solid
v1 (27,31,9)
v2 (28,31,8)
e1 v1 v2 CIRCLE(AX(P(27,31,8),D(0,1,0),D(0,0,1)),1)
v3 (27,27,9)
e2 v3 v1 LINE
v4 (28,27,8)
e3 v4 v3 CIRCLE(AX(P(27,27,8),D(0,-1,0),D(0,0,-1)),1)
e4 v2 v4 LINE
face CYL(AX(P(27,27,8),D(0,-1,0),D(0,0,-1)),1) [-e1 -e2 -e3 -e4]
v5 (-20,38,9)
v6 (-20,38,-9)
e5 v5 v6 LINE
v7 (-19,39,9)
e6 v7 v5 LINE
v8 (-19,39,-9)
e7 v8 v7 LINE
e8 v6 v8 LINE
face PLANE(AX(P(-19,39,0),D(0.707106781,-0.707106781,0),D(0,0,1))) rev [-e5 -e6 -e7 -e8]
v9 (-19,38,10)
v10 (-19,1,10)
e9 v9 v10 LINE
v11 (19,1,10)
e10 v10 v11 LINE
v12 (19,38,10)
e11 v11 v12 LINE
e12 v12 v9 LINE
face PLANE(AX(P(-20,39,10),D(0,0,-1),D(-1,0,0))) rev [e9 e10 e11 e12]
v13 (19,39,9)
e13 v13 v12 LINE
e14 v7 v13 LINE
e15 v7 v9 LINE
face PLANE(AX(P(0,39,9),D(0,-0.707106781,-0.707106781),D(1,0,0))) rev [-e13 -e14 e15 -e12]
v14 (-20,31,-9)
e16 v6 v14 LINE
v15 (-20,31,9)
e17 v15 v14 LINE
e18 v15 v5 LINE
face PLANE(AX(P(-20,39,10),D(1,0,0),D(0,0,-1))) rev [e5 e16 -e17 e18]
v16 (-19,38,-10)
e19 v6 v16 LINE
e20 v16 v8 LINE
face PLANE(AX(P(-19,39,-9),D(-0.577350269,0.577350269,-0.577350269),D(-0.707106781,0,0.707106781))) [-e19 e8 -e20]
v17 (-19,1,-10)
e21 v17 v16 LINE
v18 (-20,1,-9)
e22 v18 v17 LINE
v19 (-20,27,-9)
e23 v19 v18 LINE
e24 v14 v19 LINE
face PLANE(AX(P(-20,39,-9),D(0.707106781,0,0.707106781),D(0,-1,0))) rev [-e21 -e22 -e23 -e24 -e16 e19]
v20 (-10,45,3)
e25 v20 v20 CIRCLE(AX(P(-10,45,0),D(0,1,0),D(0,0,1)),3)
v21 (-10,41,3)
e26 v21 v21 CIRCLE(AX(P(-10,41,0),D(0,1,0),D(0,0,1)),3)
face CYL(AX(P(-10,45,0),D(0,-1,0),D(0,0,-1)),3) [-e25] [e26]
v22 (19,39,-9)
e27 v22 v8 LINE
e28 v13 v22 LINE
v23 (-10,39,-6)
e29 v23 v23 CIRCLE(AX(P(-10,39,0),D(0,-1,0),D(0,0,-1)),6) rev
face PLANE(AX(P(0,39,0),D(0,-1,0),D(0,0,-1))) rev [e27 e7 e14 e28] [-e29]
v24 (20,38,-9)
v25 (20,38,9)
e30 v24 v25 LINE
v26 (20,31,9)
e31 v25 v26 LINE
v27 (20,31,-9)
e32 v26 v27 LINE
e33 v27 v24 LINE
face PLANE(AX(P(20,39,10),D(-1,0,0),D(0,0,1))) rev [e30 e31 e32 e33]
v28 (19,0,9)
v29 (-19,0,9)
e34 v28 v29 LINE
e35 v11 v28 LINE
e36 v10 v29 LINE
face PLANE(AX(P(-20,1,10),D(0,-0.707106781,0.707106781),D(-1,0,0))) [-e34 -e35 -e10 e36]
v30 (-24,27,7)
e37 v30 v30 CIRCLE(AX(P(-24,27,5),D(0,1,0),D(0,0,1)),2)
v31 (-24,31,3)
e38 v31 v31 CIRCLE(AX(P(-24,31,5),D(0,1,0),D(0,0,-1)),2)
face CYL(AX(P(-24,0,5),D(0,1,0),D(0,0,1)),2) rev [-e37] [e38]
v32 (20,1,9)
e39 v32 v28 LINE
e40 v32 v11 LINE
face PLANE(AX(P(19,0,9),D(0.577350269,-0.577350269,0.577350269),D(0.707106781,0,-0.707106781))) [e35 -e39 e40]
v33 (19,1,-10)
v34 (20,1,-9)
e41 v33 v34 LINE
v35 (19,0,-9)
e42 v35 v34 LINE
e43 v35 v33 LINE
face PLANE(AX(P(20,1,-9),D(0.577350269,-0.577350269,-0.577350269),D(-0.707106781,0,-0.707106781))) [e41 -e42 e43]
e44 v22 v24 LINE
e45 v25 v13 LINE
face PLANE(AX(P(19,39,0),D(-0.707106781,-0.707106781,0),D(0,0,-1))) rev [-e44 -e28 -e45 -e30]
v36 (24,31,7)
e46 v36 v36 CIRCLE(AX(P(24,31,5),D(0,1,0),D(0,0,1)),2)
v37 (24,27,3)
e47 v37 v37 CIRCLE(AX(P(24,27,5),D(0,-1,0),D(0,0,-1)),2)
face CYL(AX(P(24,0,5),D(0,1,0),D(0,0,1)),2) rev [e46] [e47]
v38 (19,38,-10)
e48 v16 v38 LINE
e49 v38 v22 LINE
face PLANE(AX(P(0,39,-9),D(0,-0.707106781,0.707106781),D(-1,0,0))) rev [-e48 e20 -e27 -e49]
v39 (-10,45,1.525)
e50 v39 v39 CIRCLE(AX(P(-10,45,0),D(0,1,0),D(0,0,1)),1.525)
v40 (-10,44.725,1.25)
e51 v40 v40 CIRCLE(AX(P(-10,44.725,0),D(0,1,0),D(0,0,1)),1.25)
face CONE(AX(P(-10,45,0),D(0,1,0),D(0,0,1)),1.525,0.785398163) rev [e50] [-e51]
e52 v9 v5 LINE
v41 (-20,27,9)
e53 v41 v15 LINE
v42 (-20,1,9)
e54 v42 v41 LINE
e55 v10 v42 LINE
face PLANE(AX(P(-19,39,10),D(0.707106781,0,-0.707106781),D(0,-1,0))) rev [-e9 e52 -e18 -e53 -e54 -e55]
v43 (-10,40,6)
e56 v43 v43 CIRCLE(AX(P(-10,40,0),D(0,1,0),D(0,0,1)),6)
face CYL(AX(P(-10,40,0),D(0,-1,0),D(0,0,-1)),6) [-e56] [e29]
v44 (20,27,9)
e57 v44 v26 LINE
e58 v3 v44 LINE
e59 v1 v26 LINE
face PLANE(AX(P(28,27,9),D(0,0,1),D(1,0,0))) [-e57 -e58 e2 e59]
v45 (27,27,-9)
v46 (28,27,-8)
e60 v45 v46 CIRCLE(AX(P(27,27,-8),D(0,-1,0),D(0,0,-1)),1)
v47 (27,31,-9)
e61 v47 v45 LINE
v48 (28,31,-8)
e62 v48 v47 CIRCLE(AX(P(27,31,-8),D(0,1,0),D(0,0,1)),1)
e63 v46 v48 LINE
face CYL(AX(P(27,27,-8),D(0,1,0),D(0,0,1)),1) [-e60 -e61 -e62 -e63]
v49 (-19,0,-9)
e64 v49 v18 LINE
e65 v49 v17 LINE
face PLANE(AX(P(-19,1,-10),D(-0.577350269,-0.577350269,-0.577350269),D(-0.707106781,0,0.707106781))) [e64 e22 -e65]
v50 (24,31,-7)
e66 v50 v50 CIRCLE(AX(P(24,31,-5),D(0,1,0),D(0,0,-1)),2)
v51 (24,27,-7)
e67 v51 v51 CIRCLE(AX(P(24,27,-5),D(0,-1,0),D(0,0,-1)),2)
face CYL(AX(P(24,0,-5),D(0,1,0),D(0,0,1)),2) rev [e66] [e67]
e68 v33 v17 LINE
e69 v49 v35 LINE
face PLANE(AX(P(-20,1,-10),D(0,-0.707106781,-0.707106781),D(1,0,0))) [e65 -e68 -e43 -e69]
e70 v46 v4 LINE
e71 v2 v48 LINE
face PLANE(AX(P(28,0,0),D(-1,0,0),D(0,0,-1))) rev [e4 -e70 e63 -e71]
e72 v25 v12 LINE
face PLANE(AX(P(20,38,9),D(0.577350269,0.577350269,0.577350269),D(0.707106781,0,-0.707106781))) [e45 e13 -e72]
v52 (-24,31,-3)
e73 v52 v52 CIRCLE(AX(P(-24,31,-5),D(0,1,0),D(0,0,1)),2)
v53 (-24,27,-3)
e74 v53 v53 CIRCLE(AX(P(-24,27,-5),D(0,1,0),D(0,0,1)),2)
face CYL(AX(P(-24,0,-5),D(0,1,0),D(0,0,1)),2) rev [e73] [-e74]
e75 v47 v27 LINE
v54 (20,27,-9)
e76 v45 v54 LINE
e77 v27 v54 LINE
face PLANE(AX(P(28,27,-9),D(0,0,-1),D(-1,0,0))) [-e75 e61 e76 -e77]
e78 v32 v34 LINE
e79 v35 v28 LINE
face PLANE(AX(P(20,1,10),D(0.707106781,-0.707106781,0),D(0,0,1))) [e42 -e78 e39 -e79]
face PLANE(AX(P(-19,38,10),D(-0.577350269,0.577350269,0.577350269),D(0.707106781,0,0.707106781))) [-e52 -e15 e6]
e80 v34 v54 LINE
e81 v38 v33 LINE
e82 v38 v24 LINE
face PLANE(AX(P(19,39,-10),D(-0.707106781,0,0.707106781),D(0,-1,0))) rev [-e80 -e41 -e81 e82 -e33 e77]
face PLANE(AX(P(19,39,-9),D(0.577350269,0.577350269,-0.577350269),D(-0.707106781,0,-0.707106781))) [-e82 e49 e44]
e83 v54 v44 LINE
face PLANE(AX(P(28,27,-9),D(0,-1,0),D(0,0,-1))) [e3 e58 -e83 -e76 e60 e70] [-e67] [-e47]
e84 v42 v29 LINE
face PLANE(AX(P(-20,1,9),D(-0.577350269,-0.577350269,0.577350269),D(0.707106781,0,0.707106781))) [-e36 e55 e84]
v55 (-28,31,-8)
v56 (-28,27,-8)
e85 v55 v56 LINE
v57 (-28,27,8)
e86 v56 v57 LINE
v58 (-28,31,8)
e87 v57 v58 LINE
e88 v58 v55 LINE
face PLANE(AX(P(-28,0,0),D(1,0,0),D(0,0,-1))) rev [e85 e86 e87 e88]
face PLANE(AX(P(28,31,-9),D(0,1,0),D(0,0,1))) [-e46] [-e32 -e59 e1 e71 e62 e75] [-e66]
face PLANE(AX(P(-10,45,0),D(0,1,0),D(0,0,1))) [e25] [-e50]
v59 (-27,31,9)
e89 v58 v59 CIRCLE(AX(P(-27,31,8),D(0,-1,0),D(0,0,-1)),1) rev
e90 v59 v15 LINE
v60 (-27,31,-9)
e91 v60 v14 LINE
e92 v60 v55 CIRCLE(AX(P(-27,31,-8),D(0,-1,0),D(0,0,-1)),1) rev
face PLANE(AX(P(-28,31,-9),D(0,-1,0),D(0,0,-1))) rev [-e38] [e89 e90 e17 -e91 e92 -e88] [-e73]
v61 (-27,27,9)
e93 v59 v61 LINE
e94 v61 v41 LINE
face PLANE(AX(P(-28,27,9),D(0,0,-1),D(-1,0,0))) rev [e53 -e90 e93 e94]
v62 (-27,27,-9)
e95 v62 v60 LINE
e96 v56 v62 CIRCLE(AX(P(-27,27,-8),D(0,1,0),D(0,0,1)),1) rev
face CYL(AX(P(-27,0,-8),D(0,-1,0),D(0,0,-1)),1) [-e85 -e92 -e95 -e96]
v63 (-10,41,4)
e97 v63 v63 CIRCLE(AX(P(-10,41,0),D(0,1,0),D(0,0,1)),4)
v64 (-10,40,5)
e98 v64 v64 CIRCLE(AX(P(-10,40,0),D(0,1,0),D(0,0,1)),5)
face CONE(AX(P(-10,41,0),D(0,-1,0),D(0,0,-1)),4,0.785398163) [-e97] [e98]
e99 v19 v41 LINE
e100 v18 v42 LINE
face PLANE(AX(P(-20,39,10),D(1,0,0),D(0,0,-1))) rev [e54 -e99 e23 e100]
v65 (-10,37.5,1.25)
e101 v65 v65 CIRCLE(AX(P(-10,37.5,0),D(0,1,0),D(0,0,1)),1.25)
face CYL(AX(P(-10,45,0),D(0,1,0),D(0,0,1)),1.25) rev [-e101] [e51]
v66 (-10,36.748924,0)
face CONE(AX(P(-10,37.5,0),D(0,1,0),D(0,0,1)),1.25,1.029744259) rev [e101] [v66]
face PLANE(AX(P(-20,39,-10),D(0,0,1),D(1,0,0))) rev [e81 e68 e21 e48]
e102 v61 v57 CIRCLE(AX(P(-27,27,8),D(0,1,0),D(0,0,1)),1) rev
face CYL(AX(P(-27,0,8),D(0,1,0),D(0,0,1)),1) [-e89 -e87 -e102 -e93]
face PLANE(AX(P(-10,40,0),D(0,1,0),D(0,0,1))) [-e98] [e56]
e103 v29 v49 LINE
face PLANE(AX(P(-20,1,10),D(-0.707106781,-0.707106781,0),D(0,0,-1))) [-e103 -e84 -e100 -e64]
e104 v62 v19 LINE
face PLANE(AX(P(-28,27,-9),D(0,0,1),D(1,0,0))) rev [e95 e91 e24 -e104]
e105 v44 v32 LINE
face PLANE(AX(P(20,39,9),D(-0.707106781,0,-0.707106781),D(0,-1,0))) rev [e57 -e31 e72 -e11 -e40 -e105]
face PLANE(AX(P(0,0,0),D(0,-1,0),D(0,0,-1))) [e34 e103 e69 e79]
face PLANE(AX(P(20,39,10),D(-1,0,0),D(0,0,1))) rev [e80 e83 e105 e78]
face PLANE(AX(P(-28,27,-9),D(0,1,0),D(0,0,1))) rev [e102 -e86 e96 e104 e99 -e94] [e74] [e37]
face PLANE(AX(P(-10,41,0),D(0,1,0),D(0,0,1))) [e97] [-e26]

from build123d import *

# Parameters (mm, degrees)
SKETCH_1_W                   = 40
SKETCH_1_H                   = 20
EXTRUDE_1_DEPTH              = 39
CHAMFER_1_SIZE               = 1
SKETCH_12_W                  = 18
SKETCH_12_H                  = 4
EXTRUDE_7_DEPTH              = 8
SKETCH_13_R                  = 2
CUT_EXTRUDE_2_DEPTH          = 43.95346319
FILLET_3_R                   = 1
SKETCH_14_R                  = 6
EXTRUDE_8_DEPTH              = 1
SKETCH_15_R                  = 5
EXTRUDE_9_DEPTH              = 1
SKETCH_16_R                  = 3
EXTRUDE_10_DEPTH             = 4
HOLE_WIZARD_M3_2_D           = 2.5
HOLE_WIZARD_M3_2_DEPTH       = 7.5
HOLE_WIZARD_M3_2_CSINK_D     = 3.05
HOLE_WIZARD_M3_2_CSINK_ANGLE = 90
HOLE_WIZARD_M3_2_TIP         = 0.751075774
CHAMFER_3_SIZE               = 1


with BuildPart() as part:
    # 草图1 → 凸台-拉伸1 (new body)
    with BuildSketch(Plane(origin=(0, 0, 0), x_dir=(1, 0, 0), z_dir=(0, 1, 0))):
        Rectangle(SKETCH_1_W, SKETCH_1_H)
    extrude(amount=EXTRUDE_1_DEPTH)

    # 倒角1
    chamfer_1_edges = [part.edges().sort_by_distance(p)[0] for p in [
        (-20, 39, 0),
        (0, 39, 10),
        (20, 39, 0),
        (0, 0, 10),
        (-20, 0, 0),
        (0, 0, -10),
        (20, 0, 0),
        (20, 19.5, 10),
        (-20, 19.5, 10),
        (-20, 19.5, -10),
        (20, 19.5, -10),
        (0, 39, -10),
    ]]
    chamfer(chamfer_1_edges, length=CHAMFER_1_SIZE)

    # 草图12 → 凸台-拉伸7 (add)
    with BuildSketch(Plane.ZY.offset(20)):
        with Locations((0, 29)):
            Rectangle(SKETCH_12_W, SKETCH_12_H)
    extrude_7 = extrude(amount=EXTRUDE_7_DEPTH)

    # 镜向1: 凸台-拉伸7 across plane
    add(extrude_7.mirror(Plane(origin=(0, 0, 0), x_dir=(0, 0, 1), z_dir=(1, 0, 0))))

    # 草图13 → 切除-拉伸2 (cut, through all)
    with BuildSketch(Plane(origin=(0, 31, 0), x_dir=(1, 0, 0), z_dir=(0, 1, 0))):
        with Locations(Location((-24, 5, 0), (0, 0, 270))):
            Circle(SKETCH_13_R)
        with Locations(Location((-24, -5, 0), (0, 0, 270))):
            Circle(SKETCH_13_R)
        with Locations(Location((24, -5, 0), (0, 0, 270))):
            Circle(SKETCH_13_R)
        with Locations(Location((24, 5, 0), (0, 0, 90))):
            Circle(SKETCH_13_R)
    extrude(amount=-CUT_EXTRUDE_2_DEPTH, mode=Mode.SUBTRACT)

    # 圆角3
    fillet_3_edges = [part.edges().sort_by_distance(p)[0] for p in [
        (-28, 29, 9),
        (-28, 29, -9),
        (28, 29, 9),
        (28, 29, -9),
    ]]
    fillet(fillet_3_edges, radius=FILLET_3_R)

    # 草图14 → 凸台-拉伸8 (add)
    with BuildSketch(Plane(origin=(0, 39, 0), x_dir=(1, 0, 0), z_dir=(0, 1, 0))):
        with Locations(Location((-10, 0, 0), (0, 0, 90))):
            Circle(SKETCH_14_R)
    extrude(amount=EXTRUDE_8_DEPTH)

    # 草图15 → 凸台-拉伸9 (add)
    with BuildSketch(Plane(origin=(0, 40, 0), x_dir=(1, 0, 0), z_dir=(0, 1, 0))):
        with Locations(Location((-10, 0, 0), (0, 0, 270))):
            Circle(SKETCH_15_R)
    extrude(amount=EXTRUDE_9_DEPTH)

    # 草图16 → 凸台-拉伸10 (add)
    with BuildSketch(Plane(origin=(0, 41, 0), x_dir=(1, 0, 0), z_dir=(0, 1, 0))):
        with Locations(Location((-10, 0, 0), (0, 0, 270))):
            Circle(SKETCH_16_R)
    extrude(amount=EXTRUDE_10_DEPTH)

    # M3 螺纹孔2
    with Locations(Plane(origin=(0, 45, 0), x_dir=(1, 0, 0), z_dir=(0, 1, 0))):
        with Locations((-10, 0)):
            CounterSinkHole(HOLE_WIZARD_M3_2_D / 2, HOLE_WIZARD_M3_2_CSINK_D / 2, depth=HOLE_WIZARD_M3_2_DEPTH, counter_sink_angle=HOLE_WIZARD_M3_2_CSINK_ANGLE)
            with Locations((0, 0, -(HOLE_WIZARD_M3_2_DEPTH + HOLE_WIZARD_M3_2_TIP / 2))):  # 118° drill point
                Cone(0, HOLE_WIZARD_M3_2_D / 2, HOLE_WIZARD_M3_2_TIP, mode=Mode.SUBTRACT)

    # 倒角3
    chamfer_3_edges = [part.edges().sort_by_distance(p)[0] for p in [
        (-10, 41, -5),
    ]]
    chamfer(chamfer_3_edges, length=CHAMFER_3_SIZE - 0.0001)  # a hair under: the kernel refuses the full size


solid = part.part
